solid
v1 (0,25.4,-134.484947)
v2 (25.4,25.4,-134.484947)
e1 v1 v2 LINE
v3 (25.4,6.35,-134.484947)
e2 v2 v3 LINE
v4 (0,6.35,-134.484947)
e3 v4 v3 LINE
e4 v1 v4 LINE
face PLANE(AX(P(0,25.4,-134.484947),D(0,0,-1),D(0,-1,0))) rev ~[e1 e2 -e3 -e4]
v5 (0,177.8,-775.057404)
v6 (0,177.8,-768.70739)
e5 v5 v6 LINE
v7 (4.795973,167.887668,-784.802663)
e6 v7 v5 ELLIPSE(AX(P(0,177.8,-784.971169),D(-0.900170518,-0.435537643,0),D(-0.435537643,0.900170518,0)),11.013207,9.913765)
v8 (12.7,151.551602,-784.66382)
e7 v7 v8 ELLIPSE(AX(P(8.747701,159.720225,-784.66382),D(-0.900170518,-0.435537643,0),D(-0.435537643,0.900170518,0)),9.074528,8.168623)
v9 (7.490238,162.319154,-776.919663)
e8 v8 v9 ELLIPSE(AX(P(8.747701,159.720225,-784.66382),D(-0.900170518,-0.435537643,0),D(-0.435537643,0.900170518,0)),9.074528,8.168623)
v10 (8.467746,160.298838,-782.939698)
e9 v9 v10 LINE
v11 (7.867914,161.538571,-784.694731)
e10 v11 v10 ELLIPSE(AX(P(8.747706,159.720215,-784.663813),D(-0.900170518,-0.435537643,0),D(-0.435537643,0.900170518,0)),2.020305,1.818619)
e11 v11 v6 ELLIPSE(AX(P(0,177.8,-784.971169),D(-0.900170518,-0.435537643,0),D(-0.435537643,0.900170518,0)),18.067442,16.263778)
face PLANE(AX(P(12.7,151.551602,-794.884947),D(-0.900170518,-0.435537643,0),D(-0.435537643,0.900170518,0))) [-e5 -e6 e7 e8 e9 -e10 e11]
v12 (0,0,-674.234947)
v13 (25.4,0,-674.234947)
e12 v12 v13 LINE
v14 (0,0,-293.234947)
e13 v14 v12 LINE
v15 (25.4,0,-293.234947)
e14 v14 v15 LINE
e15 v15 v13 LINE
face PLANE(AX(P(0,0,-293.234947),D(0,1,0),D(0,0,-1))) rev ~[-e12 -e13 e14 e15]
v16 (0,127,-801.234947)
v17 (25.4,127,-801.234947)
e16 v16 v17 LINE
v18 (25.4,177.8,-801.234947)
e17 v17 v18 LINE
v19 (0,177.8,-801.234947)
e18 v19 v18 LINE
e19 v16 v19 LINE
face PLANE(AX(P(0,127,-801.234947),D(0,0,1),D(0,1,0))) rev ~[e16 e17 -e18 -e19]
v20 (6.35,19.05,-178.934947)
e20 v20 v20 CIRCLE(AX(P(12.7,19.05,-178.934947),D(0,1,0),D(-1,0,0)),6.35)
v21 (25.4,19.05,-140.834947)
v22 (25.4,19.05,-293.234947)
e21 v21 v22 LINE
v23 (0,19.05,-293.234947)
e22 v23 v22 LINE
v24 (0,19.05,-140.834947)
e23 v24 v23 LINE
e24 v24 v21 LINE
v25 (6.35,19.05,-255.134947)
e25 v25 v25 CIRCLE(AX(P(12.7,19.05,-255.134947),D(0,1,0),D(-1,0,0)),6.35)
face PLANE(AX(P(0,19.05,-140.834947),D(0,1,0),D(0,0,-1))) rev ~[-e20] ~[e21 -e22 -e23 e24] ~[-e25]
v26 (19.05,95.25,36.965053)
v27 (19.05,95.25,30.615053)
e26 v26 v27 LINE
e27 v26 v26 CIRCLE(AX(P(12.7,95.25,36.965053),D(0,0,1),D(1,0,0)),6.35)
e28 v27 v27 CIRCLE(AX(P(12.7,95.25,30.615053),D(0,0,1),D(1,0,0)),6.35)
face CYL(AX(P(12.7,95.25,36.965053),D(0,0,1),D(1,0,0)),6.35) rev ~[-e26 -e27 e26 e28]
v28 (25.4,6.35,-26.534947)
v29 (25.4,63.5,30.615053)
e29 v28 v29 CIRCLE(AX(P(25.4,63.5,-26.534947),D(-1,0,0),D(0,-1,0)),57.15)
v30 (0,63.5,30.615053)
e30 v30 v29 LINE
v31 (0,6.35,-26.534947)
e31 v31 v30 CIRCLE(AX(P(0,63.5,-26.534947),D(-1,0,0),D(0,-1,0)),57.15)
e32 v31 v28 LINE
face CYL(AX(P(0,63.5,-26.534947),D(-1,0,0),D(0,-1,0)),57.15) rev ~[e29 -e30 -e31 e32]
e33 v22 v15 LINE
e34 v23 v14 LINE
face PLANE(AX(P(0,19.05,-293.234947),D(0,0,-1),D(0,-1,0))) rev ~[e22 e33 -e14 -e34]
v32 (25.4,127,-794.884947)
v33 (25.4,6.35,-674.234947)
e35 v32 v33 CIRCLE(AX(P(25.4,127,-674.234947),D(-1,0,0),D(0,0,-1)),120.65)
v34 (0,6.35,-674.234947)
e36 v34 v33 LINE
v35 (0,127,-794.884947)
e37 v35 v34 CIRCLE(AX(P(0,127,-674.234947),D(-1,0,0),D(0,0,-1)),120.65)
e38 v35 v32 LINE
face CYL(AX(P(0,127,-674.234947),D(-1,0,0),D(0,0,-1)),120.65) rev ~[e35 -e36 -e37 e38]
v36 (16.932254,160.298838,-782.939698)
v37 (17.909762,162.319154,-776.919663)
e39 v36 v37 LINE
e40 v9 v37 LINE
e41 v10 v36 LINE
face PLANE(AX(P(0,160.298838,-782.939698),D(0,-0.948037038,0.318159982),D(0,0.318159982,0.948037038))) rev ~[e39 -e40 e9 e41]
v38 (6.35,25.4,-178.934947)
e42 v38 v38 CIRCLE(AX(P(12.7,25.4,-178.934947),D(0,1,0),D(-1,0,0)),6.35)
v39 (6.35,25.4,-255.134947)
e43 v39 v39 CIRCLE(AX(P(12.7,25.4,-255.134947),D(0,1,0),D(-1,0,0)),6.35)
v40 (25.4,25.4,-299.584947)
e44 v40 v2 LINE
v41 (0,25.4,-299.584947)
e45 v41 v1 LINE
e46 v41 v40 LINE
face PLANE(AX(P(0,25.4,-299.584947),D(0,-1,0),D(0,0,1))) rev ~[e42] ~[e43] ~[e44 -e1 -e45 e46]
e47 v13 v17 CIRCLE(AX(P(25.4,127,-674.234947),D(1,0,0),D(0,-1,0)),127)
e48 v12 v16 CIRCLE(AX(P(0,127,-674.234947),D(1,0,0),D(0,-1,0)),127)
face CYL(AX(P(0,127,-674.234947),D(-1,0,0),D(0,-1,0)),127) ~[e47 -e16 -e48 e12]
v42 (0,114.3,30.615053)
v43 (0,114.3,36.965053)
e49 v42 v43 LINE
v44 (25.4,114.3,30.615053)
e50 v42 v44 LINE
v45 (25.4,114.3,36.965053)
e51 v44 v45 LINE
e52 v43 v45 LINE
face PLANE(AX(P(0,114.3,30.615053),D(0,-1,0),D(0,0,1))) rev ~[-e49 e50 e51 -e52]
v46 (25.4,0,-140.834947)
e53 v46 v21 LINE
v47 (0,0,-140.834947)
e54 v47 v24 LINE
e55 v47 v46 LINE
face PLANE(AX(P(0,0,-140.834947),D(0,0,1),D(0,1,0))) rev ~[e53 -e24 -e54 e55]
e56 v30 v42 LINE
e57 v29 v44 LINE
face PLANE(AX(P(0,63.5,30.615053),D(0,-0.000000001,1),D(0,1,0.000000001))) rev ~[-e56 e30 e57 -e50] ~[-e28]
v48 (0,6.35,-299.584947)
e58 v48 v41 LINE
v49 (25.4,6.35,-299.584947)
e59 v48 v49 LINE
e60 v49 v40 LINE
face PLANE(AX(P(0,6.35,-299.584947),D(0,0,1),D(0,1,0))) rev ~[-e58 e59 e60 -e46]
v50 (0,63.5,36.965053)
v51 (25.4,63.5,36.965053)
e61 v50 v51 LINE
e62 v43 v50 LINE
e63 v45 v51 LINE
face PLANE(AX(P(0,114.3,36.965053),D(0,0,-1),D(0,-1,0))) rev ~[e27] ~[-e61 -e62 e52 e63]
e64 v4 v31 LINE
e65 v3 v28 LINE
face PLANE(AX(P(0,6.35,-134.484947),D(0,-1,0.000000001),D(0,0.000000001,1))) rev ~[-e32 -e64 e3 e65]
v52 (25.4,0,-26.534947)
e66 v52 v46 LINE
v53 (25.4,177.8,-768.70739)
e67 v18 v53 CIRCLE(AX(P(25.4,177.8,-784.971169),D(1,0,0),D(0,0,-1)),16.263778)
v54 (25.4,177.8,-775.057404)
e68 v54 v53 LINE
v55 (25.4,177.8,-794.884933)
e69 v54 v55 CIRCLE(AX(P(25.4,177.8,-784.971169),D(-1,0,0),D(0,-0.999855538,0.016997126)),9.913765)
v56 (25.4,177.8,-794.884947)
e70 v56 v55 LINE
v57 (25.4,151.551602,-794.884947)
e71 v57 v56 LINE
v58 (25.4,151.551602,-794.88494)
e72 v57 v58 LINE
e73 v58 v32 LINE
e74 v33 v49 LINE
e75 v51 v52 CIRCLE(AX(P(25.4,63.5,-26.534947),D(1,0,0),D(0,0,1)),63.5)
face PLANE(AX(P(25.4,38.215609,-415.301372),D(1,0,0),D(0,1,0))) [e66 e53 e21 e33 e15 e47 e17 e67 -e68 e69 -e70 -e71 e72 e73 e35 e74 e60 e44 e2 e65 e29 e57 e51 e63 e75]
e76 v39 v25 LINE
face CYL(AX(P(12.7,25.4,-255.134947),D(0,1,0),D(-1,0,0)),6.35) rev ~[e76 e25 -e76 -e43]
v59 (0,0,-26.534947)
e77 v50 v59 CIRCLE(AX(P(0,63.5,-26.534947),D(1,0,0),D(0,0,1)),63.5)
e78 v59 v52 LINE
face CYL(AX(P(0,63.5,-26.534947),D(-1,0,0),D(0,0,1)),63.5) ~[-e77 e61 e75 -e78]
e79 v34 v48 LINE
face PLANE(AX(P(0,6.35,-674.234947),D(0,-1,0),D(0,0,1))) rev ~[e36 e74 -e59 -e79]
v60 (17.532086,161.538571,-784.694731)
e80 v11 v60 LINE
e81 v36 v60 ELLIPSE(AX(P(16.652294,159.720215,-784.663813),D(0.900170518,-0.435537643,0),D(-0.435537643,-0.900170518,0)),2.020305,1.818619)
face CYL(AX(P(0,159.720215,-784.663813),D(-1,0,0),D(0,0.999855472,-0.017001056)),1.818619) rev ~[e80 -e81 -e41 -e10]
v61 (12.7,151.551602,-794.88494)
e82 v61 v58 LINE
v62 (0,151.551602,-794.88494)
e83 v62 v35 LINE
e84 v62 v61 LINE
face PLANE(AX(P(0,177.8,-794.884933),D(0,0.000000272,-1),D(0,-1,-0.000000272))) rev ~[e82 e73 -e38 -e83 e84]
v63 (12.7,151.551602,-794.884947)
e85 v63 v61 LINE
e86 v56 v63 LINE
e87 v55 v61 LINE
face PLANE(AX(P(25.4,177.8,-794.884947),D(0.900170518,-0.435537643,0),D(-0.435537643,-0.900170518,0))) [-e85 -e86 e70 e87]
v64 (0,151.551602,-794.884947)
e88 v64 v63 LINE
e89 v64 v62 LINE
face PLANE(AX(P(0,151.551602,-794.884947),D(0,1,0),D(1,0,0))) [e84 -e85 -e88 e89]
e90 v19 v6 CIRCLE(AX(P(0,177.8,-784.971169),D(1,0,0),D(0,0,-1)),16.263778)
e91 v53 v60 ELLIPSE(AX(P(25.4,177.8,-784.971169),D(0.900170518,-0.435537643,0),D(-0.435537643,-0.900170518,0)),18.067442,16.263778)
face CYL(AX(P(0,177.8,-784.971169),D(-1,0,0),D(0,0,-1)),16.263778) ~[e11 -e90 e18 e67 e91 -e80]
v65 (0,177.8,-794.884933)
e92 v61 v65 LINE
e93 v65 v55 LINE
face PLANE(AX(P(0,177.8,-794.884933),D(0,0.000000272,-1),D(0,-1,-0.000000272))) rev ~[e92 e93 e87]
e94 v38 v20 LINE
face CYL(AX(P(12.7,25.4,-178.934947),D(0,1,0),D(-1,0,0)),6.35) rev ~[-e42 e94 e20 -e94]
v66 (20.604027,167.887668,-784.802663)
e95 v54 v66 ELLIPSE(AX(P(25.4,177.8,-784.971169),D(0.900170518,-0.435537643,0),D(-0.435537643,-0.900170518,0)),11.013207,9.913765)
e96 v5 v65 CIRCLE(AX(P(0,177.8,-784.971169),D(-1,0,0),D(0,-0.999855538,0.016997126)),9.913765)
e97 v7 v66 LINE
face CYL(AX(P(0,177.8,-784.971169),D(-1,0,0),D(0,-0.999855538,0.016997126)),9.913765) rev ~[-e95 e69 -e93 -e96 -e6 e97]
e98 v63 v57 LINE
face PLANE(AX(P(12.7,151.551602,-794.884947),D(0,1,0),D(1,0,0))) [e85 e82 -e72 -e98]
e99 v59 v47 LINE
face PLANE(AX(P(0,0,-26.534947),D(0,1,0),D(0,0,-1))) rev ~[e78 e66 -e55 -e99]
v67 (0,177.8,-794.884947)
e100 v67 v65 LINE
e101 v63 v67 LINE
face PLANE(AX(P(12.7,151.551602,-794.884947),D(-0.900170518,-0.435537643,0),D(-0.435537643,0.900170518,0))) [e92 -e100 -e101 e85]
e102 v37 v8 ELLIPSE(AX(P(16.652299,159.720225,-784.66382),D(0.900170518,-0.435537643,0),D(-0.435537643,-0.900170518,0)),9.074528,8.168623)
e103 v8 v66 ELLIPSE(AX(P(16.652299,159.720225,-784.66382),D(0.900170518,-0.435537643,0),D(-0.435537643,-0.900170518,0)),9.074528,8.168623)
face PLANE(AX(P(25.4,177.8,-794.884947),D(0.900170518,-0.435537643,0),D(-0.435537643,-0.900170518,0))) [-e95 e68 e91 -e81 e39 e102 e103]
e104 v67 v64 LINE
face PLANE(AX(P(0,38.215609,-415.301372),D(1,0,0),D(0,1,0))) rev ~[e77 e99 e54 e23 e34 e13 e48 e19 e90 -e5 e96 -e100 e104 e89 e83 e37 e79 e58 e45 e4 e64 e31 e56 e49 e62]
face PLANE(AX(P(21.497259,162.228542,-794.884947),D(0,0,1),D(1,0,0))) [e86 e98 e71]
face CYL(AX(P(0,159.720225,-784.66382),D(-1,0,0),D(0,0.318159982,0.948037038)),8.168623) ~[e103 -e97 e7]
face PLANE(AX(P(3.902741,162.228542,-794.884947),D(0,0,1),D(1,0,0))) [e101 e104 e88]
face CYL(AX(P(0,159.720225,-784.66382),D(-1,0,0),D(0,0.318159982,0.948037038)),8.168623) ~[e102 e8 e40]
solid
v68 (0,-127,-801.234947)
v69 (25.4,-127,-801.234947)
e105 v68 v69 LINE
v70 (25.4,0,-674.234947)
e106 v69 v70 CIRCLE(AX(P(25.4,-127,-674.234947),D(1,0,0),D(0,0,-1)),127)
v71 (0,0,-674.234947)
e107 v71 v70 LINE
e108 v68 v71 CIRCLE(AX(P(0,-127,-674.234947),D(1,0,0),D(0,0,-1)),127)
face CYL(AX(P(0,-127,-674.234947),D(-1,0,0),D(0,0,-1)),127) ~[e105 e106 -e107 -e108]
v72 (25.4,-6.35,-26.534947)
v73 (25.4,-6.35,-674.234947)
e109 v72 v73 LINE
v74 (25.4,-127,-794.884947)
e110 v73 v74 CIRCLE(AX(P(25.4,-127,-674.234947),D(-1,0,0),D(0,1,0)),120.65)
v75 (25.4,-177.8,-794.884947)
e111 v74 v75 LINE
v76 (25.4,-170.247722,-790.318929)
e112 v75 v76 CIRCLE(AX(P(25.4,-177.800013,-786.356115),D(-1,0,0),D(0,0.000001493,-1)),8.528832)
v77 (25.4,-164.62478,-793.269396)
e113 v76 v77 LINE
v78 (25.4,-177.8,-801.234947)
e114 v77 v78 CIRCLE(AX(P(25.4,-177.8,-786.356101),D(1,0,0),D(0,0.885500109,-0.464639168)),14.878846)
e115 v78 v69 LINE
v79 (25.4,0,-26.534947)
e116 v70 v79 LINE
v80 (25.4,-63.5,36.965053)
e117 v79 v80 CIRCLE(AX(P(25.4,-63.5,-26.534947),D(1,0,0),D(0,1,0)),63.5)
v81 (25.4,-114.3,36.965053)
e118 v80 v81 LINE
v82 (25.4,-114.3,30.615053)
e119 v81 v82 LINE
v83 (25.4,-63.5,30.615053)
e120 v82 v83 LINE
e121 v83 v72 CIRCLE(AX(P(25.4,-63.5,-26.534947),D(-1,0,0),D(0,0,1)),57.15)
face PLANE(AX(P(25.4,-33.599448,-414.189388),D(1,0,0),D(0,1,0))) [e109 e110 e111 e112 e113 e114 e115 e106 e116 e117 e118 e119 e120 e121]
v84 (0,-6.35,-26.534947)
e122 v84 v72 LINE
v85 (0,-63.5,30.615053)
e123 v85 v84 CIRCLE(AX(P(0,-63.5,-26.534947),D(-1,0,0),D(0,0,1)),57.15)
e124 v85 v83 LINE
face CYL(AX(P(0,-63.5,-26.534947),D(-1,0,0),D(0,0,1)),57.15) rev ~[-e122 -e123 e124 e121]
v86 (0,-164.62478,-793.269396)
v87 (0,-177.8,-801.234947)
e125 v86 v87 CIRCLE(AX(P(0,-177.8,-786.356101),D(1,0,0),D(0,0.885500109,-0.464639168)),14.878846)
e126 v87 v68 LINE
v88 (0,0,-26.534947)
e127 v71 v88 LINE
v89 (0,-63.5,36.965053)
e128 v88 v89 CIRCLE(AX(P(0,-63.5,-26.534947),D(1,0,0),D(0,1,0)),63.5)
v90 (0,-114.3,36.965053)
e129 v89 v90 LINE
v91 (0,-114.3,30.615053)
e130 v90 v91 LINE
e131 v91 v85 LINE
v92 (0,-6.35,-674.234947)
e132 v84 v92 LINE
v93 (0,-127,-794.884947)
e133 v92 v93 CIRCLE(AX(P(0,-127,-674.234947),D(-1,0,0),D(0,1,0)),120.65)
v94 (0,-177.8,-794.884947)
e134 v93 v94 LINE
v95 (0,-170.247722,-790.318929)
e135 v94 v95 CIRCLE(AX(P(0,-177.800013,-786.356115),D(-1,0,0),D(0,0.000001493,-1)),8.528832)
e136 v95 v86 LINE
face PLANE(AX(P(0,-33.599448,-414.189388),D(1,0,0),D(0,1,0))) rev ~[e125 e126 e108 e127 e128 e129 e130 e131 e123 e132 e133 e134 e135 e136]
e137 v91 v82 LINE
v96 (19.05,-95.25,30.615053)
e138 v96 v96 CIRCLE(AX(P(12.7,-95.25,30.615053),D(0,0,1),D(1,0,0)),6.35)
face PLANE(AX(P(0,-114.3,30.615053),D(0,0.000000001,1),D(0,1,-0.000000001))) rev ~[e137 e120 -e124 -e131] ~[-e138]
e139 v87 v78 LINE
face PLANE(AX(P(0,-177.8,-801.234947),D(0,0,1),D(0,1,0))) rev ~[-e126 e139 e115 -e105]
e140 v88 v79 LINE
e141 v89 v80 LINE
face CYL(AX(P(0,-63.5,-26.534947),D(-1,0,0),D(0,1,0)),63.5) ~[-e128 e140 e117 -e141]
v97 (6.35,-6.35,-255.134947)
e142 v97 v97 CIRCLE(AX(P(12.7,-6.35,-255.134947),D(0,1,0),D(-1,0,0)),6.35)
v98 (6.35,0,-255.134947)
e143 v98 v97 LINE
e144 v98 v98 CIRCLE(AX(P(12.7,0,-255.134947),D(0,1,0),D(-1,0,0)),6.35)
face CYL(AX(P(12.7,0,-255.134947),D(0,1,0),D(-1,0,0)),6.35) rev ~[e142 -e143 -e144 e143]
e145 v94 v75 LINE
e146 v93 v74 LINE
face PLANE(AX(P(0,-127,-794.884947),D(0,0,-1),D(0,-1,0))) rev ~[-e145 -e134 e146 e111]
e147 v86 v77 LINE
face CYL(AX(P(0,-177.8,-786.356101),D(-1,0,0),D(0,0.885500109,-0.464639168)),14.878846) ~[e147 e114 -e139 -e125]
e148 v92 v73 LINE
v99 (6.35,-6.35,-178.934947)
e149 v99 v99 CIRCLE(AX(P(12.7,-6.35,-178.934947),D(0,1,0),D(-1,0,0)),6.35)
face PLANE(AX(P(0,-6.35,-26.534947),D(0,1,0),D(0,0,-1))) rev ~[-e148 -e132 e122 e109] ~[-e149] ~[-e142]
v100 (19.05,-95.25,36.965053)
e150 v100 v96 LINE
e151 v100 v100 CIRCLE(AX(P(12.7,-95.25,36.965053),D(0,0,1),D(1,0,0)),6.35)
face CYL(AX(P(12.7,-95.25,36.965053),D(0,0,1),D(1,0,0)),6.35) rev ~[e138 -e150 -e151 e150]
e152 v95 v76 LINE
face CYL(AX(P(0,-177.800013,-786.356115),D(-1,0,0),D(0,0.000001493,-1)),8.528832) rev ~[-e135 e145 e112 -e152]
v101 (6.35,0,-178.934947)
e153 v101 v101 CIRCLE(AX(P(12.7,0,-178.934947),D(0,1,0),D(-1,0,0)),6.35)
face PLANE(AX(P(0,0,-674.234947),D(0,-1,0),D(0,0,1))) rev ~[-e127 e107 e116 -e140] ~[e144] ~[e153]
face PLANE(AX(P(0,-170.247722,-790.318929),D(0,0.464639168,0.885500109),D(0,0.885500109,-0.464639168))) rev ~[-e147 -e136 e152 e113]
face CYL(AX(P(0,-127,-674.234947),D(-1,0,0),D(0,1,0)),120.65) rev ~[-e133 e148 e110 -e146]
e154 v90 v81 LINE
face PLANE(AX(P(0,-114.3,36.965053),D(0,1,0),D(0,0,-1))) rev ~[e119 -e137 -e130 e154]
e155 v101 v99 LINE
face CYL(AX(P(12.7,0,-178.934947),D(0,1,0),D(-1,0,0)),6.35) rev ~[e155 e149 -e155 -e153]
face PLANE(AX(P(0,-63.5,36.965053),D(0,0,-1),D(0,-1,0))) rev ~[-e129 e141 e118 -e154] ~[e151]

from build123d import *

# Parameters (mm, degrees)
F1_DEPTH  = 25.4
F2_R      = 6.35
F3_DEPTH  = 25.4009999233
F4_DEPTH  = 25.4
F5_R      = 6.35
F6_DEPTH  = 192.6798458016
F7_R      = 6.35
F8_DEPTH  = 25.4
F10_DEPTH = 37.846


# Not quite as in the source:
# - ends of sketch curves that miss each other by under 0.0002 mm in the source are joined


with BuildPart() as f1:
    # F0 (on Right) → F1 (new body)
    with BuildSketch(Plane.YZ):
        with BuildLine():
            ThreePointArc((63.5, 36.9650529042), (18.5987193947, 18.3663335095), (0, -26.5349470958))
            Line((0, -26.5349470958), (0, -140.8349470958))
            Line((0, -140.8349470958), (19.05, -140.8349470958))
            Line((19.05, -140.8349470958), (19.05, -293.2349470958))
            Line((19.05, -293.2349470958), (0, -293.2349470958))
            Line((0, -293.2349470958), (0, -674.2349470958))
            ThreePointArc((0, -674.2349470958), (37.1974387893, -764.0375083065), (127, -801.2349470958))
            Line((127, -801.2349470958), (177.8, -801.2349470958))
            ThreePointArc((177.8, -801.2349470958), (189.3975515729, -773.5690950337), (161.5385711193, -784.6947312355))
            ThreePointArc((161.5385711193, -784.6947312355), (158.2348270865, -785.7130978667), (160.2988376632, -782.9396981457))
            Line((160.2988376632, -782.9396981457), (162.3191535473, -776.9196629524))
            ThreePointArc((162.3191535473, -776.9196629524), (153.0483347508, -789.3768114543), (167.8876675483, -784.8026632189))
            ThreePointArc((167.8876675483, -784.8026632189), (184.8694148503, -778.0209095625), (177.8, -794.8849333338))
            Line((177.8, -794.8849333338), (127, -794.8849471726))
            ThreePointArc((127, -794.8849471726), (41.6875667956, -759.5473803002), (6.3499999233, -674.2349470958))
            Line((6.3499999233, -674.2349470958), (6.3499999233, -299.5849470191))
            Line((6.3499999233, -299.5849470191), (25.3999999233, -299.5849470191))
            Line((25.3999999233, -299.5849470191), (25.3999999233, -134.4849471726))
            Line((25.3999999233, -134.4849471726), (6.3499999233, -134.4849471726))
            Line((6.3499999233, -134.4849471726), (6.35, -26.5349470958))
            ThreePointArc((6.35, -26.5349470958), (23.0888474552, 13.876205449), (63.5, 30.6150529042))
            Line((63.5, 30.6150529042), (114.3, 30.6150529383))
            Line((114.3, 30.6150529383), (114.3, 36.9650529042))
            Line((114.3, 36.9650529042), (63.5, 36.9650529042))
        make_face()
    extrude(amount=F1_DEPTH)

    # F2 (on face) → F3 (cut, through all)
    with BuildSketch(Plane(origin=(0, 25.3999999233, 0), x_dir=(-1, 0, 0), z_dir=(0, 1, 0))):
        with Locations((-12.7, -178.9349470958)):
            Circle(F2_R)
        with Locations((-12.7, -255.1349470958)):
            Circle(F2_R)
    extrude(amount=-F3_DEPTH, mode=Mode.SUBTRACT)


with BuildPart() as f4:
    # F0 (on Right) → F4 (new body)
    with BuildSketch(Plane.YZ):
        with BuildLine():
            Line((0, -140.8349470958), (0, -26.5349470958))
            ThreePointArc((0, -26.5349470958), (-18.5987193947, 18.3663335095), (-63.5, 36.9650529042))
            Line((-63.5, 36.9650529042), (-114.3, 36.9650529042))
            Line((-114.3, 36.9650529042), (-114.3, 30.6150529383))
            Line((-114.3, 30.6150529383), (-63.5, 30.6150529042))
            ThreePointArc((-63.5, 30.6150529042), (-23.0888474552, 13.876205449), (-6.35, -26.5349470958))
            Line((-6.35, -26.5349470958), (-6.3499999233, -674.2349470958))
            ThreePointArc((-6.3499999233, -674.2349470958), (-41.6875667956, -759.5473803002), (-127, -794.8849471726))
            Line((-127, -794.8849471726), (-177.8, -794.8849471726))
            ThreePointArc((-177.8, -794.8849471726), (-182.2126311124, -779.0574998673), (-170.2477224413, -790.3189285424))
            Line((-170.2477224413, -790.3189285424), (-164.6247804165, -793.2693958282))
            ThreePointArc((-164.6247804165, -793.2693958282), (-185.4979935384, -773.6234288382), (-177.8, -801.2349470958))
            Line((-177.8, -801.2349470958), (-127, -801.2349470958))
            ThreePointArc((-127, -801.2349470958), (-37.1974387893, -764.0375083065), (0, -674.2349470958))
            Line((0, -674.2349470958), (0, -293.2349470958))
            Line((0, -293.2349470958), (0, -140.8349470958))
        make_face()
    extrude(amount=F4_DEPTH)

    # F5 (on face) → F6 (cut, through all)
    with BuildSketch(Plane(origin=(0, 0, 0), x_dir=(-1, 0, 0), z_dir=(0, 1, 0))):
        with Locations((-12.7, -178.9349470958)):
            Circle(F5_R)
        with Locations((-12.7, -255.1349470958)):
            Circle(F5_R)
    extrude(amount=-F6_DEPTH, mode=Mode.SUBTRACT)


with BuildPart() as f8_tool:
    # F7 (on face) → F8 (new body)
    with BuildSketch(Plane.XY.offset(36.9650529042)):
        with Locations((12.7, 95.25)):
            Circle(F7_R)
        with Locations((12.7, -95.25)):
            Circle(F7_R)
    extrude(amount=-F8_DEPTH)


with BuildPart() as f1_1:
    add(f1.part)

    # F8: cut by f8_tool
    add(f8_tool.part, mode=Mode.SUBTRACT)

    # F9 (on face) → F10 (cut)
    with BuildSketch(Plane.XY.offset(-794.8849471726)):
        Polygon((0, 151.5516016069), (12.7, 151.5516016069), (0, 177.8), align=None)
        Polygon((12.7, 151.5516016069), (25.4, 151.5516016069), (25.4, 177.8), align=None)
    extrude(amount=F10_DEPTH, mode=Mode.SUBTRACT)


with BuildPart() as f4_1:
    add(f4.part)

    # F8: cut by f8_tool
    add(f8_tool.part, mode=Mode.SUBTRACT)


solid = Compound([f1_1.part, f4_1.part])
